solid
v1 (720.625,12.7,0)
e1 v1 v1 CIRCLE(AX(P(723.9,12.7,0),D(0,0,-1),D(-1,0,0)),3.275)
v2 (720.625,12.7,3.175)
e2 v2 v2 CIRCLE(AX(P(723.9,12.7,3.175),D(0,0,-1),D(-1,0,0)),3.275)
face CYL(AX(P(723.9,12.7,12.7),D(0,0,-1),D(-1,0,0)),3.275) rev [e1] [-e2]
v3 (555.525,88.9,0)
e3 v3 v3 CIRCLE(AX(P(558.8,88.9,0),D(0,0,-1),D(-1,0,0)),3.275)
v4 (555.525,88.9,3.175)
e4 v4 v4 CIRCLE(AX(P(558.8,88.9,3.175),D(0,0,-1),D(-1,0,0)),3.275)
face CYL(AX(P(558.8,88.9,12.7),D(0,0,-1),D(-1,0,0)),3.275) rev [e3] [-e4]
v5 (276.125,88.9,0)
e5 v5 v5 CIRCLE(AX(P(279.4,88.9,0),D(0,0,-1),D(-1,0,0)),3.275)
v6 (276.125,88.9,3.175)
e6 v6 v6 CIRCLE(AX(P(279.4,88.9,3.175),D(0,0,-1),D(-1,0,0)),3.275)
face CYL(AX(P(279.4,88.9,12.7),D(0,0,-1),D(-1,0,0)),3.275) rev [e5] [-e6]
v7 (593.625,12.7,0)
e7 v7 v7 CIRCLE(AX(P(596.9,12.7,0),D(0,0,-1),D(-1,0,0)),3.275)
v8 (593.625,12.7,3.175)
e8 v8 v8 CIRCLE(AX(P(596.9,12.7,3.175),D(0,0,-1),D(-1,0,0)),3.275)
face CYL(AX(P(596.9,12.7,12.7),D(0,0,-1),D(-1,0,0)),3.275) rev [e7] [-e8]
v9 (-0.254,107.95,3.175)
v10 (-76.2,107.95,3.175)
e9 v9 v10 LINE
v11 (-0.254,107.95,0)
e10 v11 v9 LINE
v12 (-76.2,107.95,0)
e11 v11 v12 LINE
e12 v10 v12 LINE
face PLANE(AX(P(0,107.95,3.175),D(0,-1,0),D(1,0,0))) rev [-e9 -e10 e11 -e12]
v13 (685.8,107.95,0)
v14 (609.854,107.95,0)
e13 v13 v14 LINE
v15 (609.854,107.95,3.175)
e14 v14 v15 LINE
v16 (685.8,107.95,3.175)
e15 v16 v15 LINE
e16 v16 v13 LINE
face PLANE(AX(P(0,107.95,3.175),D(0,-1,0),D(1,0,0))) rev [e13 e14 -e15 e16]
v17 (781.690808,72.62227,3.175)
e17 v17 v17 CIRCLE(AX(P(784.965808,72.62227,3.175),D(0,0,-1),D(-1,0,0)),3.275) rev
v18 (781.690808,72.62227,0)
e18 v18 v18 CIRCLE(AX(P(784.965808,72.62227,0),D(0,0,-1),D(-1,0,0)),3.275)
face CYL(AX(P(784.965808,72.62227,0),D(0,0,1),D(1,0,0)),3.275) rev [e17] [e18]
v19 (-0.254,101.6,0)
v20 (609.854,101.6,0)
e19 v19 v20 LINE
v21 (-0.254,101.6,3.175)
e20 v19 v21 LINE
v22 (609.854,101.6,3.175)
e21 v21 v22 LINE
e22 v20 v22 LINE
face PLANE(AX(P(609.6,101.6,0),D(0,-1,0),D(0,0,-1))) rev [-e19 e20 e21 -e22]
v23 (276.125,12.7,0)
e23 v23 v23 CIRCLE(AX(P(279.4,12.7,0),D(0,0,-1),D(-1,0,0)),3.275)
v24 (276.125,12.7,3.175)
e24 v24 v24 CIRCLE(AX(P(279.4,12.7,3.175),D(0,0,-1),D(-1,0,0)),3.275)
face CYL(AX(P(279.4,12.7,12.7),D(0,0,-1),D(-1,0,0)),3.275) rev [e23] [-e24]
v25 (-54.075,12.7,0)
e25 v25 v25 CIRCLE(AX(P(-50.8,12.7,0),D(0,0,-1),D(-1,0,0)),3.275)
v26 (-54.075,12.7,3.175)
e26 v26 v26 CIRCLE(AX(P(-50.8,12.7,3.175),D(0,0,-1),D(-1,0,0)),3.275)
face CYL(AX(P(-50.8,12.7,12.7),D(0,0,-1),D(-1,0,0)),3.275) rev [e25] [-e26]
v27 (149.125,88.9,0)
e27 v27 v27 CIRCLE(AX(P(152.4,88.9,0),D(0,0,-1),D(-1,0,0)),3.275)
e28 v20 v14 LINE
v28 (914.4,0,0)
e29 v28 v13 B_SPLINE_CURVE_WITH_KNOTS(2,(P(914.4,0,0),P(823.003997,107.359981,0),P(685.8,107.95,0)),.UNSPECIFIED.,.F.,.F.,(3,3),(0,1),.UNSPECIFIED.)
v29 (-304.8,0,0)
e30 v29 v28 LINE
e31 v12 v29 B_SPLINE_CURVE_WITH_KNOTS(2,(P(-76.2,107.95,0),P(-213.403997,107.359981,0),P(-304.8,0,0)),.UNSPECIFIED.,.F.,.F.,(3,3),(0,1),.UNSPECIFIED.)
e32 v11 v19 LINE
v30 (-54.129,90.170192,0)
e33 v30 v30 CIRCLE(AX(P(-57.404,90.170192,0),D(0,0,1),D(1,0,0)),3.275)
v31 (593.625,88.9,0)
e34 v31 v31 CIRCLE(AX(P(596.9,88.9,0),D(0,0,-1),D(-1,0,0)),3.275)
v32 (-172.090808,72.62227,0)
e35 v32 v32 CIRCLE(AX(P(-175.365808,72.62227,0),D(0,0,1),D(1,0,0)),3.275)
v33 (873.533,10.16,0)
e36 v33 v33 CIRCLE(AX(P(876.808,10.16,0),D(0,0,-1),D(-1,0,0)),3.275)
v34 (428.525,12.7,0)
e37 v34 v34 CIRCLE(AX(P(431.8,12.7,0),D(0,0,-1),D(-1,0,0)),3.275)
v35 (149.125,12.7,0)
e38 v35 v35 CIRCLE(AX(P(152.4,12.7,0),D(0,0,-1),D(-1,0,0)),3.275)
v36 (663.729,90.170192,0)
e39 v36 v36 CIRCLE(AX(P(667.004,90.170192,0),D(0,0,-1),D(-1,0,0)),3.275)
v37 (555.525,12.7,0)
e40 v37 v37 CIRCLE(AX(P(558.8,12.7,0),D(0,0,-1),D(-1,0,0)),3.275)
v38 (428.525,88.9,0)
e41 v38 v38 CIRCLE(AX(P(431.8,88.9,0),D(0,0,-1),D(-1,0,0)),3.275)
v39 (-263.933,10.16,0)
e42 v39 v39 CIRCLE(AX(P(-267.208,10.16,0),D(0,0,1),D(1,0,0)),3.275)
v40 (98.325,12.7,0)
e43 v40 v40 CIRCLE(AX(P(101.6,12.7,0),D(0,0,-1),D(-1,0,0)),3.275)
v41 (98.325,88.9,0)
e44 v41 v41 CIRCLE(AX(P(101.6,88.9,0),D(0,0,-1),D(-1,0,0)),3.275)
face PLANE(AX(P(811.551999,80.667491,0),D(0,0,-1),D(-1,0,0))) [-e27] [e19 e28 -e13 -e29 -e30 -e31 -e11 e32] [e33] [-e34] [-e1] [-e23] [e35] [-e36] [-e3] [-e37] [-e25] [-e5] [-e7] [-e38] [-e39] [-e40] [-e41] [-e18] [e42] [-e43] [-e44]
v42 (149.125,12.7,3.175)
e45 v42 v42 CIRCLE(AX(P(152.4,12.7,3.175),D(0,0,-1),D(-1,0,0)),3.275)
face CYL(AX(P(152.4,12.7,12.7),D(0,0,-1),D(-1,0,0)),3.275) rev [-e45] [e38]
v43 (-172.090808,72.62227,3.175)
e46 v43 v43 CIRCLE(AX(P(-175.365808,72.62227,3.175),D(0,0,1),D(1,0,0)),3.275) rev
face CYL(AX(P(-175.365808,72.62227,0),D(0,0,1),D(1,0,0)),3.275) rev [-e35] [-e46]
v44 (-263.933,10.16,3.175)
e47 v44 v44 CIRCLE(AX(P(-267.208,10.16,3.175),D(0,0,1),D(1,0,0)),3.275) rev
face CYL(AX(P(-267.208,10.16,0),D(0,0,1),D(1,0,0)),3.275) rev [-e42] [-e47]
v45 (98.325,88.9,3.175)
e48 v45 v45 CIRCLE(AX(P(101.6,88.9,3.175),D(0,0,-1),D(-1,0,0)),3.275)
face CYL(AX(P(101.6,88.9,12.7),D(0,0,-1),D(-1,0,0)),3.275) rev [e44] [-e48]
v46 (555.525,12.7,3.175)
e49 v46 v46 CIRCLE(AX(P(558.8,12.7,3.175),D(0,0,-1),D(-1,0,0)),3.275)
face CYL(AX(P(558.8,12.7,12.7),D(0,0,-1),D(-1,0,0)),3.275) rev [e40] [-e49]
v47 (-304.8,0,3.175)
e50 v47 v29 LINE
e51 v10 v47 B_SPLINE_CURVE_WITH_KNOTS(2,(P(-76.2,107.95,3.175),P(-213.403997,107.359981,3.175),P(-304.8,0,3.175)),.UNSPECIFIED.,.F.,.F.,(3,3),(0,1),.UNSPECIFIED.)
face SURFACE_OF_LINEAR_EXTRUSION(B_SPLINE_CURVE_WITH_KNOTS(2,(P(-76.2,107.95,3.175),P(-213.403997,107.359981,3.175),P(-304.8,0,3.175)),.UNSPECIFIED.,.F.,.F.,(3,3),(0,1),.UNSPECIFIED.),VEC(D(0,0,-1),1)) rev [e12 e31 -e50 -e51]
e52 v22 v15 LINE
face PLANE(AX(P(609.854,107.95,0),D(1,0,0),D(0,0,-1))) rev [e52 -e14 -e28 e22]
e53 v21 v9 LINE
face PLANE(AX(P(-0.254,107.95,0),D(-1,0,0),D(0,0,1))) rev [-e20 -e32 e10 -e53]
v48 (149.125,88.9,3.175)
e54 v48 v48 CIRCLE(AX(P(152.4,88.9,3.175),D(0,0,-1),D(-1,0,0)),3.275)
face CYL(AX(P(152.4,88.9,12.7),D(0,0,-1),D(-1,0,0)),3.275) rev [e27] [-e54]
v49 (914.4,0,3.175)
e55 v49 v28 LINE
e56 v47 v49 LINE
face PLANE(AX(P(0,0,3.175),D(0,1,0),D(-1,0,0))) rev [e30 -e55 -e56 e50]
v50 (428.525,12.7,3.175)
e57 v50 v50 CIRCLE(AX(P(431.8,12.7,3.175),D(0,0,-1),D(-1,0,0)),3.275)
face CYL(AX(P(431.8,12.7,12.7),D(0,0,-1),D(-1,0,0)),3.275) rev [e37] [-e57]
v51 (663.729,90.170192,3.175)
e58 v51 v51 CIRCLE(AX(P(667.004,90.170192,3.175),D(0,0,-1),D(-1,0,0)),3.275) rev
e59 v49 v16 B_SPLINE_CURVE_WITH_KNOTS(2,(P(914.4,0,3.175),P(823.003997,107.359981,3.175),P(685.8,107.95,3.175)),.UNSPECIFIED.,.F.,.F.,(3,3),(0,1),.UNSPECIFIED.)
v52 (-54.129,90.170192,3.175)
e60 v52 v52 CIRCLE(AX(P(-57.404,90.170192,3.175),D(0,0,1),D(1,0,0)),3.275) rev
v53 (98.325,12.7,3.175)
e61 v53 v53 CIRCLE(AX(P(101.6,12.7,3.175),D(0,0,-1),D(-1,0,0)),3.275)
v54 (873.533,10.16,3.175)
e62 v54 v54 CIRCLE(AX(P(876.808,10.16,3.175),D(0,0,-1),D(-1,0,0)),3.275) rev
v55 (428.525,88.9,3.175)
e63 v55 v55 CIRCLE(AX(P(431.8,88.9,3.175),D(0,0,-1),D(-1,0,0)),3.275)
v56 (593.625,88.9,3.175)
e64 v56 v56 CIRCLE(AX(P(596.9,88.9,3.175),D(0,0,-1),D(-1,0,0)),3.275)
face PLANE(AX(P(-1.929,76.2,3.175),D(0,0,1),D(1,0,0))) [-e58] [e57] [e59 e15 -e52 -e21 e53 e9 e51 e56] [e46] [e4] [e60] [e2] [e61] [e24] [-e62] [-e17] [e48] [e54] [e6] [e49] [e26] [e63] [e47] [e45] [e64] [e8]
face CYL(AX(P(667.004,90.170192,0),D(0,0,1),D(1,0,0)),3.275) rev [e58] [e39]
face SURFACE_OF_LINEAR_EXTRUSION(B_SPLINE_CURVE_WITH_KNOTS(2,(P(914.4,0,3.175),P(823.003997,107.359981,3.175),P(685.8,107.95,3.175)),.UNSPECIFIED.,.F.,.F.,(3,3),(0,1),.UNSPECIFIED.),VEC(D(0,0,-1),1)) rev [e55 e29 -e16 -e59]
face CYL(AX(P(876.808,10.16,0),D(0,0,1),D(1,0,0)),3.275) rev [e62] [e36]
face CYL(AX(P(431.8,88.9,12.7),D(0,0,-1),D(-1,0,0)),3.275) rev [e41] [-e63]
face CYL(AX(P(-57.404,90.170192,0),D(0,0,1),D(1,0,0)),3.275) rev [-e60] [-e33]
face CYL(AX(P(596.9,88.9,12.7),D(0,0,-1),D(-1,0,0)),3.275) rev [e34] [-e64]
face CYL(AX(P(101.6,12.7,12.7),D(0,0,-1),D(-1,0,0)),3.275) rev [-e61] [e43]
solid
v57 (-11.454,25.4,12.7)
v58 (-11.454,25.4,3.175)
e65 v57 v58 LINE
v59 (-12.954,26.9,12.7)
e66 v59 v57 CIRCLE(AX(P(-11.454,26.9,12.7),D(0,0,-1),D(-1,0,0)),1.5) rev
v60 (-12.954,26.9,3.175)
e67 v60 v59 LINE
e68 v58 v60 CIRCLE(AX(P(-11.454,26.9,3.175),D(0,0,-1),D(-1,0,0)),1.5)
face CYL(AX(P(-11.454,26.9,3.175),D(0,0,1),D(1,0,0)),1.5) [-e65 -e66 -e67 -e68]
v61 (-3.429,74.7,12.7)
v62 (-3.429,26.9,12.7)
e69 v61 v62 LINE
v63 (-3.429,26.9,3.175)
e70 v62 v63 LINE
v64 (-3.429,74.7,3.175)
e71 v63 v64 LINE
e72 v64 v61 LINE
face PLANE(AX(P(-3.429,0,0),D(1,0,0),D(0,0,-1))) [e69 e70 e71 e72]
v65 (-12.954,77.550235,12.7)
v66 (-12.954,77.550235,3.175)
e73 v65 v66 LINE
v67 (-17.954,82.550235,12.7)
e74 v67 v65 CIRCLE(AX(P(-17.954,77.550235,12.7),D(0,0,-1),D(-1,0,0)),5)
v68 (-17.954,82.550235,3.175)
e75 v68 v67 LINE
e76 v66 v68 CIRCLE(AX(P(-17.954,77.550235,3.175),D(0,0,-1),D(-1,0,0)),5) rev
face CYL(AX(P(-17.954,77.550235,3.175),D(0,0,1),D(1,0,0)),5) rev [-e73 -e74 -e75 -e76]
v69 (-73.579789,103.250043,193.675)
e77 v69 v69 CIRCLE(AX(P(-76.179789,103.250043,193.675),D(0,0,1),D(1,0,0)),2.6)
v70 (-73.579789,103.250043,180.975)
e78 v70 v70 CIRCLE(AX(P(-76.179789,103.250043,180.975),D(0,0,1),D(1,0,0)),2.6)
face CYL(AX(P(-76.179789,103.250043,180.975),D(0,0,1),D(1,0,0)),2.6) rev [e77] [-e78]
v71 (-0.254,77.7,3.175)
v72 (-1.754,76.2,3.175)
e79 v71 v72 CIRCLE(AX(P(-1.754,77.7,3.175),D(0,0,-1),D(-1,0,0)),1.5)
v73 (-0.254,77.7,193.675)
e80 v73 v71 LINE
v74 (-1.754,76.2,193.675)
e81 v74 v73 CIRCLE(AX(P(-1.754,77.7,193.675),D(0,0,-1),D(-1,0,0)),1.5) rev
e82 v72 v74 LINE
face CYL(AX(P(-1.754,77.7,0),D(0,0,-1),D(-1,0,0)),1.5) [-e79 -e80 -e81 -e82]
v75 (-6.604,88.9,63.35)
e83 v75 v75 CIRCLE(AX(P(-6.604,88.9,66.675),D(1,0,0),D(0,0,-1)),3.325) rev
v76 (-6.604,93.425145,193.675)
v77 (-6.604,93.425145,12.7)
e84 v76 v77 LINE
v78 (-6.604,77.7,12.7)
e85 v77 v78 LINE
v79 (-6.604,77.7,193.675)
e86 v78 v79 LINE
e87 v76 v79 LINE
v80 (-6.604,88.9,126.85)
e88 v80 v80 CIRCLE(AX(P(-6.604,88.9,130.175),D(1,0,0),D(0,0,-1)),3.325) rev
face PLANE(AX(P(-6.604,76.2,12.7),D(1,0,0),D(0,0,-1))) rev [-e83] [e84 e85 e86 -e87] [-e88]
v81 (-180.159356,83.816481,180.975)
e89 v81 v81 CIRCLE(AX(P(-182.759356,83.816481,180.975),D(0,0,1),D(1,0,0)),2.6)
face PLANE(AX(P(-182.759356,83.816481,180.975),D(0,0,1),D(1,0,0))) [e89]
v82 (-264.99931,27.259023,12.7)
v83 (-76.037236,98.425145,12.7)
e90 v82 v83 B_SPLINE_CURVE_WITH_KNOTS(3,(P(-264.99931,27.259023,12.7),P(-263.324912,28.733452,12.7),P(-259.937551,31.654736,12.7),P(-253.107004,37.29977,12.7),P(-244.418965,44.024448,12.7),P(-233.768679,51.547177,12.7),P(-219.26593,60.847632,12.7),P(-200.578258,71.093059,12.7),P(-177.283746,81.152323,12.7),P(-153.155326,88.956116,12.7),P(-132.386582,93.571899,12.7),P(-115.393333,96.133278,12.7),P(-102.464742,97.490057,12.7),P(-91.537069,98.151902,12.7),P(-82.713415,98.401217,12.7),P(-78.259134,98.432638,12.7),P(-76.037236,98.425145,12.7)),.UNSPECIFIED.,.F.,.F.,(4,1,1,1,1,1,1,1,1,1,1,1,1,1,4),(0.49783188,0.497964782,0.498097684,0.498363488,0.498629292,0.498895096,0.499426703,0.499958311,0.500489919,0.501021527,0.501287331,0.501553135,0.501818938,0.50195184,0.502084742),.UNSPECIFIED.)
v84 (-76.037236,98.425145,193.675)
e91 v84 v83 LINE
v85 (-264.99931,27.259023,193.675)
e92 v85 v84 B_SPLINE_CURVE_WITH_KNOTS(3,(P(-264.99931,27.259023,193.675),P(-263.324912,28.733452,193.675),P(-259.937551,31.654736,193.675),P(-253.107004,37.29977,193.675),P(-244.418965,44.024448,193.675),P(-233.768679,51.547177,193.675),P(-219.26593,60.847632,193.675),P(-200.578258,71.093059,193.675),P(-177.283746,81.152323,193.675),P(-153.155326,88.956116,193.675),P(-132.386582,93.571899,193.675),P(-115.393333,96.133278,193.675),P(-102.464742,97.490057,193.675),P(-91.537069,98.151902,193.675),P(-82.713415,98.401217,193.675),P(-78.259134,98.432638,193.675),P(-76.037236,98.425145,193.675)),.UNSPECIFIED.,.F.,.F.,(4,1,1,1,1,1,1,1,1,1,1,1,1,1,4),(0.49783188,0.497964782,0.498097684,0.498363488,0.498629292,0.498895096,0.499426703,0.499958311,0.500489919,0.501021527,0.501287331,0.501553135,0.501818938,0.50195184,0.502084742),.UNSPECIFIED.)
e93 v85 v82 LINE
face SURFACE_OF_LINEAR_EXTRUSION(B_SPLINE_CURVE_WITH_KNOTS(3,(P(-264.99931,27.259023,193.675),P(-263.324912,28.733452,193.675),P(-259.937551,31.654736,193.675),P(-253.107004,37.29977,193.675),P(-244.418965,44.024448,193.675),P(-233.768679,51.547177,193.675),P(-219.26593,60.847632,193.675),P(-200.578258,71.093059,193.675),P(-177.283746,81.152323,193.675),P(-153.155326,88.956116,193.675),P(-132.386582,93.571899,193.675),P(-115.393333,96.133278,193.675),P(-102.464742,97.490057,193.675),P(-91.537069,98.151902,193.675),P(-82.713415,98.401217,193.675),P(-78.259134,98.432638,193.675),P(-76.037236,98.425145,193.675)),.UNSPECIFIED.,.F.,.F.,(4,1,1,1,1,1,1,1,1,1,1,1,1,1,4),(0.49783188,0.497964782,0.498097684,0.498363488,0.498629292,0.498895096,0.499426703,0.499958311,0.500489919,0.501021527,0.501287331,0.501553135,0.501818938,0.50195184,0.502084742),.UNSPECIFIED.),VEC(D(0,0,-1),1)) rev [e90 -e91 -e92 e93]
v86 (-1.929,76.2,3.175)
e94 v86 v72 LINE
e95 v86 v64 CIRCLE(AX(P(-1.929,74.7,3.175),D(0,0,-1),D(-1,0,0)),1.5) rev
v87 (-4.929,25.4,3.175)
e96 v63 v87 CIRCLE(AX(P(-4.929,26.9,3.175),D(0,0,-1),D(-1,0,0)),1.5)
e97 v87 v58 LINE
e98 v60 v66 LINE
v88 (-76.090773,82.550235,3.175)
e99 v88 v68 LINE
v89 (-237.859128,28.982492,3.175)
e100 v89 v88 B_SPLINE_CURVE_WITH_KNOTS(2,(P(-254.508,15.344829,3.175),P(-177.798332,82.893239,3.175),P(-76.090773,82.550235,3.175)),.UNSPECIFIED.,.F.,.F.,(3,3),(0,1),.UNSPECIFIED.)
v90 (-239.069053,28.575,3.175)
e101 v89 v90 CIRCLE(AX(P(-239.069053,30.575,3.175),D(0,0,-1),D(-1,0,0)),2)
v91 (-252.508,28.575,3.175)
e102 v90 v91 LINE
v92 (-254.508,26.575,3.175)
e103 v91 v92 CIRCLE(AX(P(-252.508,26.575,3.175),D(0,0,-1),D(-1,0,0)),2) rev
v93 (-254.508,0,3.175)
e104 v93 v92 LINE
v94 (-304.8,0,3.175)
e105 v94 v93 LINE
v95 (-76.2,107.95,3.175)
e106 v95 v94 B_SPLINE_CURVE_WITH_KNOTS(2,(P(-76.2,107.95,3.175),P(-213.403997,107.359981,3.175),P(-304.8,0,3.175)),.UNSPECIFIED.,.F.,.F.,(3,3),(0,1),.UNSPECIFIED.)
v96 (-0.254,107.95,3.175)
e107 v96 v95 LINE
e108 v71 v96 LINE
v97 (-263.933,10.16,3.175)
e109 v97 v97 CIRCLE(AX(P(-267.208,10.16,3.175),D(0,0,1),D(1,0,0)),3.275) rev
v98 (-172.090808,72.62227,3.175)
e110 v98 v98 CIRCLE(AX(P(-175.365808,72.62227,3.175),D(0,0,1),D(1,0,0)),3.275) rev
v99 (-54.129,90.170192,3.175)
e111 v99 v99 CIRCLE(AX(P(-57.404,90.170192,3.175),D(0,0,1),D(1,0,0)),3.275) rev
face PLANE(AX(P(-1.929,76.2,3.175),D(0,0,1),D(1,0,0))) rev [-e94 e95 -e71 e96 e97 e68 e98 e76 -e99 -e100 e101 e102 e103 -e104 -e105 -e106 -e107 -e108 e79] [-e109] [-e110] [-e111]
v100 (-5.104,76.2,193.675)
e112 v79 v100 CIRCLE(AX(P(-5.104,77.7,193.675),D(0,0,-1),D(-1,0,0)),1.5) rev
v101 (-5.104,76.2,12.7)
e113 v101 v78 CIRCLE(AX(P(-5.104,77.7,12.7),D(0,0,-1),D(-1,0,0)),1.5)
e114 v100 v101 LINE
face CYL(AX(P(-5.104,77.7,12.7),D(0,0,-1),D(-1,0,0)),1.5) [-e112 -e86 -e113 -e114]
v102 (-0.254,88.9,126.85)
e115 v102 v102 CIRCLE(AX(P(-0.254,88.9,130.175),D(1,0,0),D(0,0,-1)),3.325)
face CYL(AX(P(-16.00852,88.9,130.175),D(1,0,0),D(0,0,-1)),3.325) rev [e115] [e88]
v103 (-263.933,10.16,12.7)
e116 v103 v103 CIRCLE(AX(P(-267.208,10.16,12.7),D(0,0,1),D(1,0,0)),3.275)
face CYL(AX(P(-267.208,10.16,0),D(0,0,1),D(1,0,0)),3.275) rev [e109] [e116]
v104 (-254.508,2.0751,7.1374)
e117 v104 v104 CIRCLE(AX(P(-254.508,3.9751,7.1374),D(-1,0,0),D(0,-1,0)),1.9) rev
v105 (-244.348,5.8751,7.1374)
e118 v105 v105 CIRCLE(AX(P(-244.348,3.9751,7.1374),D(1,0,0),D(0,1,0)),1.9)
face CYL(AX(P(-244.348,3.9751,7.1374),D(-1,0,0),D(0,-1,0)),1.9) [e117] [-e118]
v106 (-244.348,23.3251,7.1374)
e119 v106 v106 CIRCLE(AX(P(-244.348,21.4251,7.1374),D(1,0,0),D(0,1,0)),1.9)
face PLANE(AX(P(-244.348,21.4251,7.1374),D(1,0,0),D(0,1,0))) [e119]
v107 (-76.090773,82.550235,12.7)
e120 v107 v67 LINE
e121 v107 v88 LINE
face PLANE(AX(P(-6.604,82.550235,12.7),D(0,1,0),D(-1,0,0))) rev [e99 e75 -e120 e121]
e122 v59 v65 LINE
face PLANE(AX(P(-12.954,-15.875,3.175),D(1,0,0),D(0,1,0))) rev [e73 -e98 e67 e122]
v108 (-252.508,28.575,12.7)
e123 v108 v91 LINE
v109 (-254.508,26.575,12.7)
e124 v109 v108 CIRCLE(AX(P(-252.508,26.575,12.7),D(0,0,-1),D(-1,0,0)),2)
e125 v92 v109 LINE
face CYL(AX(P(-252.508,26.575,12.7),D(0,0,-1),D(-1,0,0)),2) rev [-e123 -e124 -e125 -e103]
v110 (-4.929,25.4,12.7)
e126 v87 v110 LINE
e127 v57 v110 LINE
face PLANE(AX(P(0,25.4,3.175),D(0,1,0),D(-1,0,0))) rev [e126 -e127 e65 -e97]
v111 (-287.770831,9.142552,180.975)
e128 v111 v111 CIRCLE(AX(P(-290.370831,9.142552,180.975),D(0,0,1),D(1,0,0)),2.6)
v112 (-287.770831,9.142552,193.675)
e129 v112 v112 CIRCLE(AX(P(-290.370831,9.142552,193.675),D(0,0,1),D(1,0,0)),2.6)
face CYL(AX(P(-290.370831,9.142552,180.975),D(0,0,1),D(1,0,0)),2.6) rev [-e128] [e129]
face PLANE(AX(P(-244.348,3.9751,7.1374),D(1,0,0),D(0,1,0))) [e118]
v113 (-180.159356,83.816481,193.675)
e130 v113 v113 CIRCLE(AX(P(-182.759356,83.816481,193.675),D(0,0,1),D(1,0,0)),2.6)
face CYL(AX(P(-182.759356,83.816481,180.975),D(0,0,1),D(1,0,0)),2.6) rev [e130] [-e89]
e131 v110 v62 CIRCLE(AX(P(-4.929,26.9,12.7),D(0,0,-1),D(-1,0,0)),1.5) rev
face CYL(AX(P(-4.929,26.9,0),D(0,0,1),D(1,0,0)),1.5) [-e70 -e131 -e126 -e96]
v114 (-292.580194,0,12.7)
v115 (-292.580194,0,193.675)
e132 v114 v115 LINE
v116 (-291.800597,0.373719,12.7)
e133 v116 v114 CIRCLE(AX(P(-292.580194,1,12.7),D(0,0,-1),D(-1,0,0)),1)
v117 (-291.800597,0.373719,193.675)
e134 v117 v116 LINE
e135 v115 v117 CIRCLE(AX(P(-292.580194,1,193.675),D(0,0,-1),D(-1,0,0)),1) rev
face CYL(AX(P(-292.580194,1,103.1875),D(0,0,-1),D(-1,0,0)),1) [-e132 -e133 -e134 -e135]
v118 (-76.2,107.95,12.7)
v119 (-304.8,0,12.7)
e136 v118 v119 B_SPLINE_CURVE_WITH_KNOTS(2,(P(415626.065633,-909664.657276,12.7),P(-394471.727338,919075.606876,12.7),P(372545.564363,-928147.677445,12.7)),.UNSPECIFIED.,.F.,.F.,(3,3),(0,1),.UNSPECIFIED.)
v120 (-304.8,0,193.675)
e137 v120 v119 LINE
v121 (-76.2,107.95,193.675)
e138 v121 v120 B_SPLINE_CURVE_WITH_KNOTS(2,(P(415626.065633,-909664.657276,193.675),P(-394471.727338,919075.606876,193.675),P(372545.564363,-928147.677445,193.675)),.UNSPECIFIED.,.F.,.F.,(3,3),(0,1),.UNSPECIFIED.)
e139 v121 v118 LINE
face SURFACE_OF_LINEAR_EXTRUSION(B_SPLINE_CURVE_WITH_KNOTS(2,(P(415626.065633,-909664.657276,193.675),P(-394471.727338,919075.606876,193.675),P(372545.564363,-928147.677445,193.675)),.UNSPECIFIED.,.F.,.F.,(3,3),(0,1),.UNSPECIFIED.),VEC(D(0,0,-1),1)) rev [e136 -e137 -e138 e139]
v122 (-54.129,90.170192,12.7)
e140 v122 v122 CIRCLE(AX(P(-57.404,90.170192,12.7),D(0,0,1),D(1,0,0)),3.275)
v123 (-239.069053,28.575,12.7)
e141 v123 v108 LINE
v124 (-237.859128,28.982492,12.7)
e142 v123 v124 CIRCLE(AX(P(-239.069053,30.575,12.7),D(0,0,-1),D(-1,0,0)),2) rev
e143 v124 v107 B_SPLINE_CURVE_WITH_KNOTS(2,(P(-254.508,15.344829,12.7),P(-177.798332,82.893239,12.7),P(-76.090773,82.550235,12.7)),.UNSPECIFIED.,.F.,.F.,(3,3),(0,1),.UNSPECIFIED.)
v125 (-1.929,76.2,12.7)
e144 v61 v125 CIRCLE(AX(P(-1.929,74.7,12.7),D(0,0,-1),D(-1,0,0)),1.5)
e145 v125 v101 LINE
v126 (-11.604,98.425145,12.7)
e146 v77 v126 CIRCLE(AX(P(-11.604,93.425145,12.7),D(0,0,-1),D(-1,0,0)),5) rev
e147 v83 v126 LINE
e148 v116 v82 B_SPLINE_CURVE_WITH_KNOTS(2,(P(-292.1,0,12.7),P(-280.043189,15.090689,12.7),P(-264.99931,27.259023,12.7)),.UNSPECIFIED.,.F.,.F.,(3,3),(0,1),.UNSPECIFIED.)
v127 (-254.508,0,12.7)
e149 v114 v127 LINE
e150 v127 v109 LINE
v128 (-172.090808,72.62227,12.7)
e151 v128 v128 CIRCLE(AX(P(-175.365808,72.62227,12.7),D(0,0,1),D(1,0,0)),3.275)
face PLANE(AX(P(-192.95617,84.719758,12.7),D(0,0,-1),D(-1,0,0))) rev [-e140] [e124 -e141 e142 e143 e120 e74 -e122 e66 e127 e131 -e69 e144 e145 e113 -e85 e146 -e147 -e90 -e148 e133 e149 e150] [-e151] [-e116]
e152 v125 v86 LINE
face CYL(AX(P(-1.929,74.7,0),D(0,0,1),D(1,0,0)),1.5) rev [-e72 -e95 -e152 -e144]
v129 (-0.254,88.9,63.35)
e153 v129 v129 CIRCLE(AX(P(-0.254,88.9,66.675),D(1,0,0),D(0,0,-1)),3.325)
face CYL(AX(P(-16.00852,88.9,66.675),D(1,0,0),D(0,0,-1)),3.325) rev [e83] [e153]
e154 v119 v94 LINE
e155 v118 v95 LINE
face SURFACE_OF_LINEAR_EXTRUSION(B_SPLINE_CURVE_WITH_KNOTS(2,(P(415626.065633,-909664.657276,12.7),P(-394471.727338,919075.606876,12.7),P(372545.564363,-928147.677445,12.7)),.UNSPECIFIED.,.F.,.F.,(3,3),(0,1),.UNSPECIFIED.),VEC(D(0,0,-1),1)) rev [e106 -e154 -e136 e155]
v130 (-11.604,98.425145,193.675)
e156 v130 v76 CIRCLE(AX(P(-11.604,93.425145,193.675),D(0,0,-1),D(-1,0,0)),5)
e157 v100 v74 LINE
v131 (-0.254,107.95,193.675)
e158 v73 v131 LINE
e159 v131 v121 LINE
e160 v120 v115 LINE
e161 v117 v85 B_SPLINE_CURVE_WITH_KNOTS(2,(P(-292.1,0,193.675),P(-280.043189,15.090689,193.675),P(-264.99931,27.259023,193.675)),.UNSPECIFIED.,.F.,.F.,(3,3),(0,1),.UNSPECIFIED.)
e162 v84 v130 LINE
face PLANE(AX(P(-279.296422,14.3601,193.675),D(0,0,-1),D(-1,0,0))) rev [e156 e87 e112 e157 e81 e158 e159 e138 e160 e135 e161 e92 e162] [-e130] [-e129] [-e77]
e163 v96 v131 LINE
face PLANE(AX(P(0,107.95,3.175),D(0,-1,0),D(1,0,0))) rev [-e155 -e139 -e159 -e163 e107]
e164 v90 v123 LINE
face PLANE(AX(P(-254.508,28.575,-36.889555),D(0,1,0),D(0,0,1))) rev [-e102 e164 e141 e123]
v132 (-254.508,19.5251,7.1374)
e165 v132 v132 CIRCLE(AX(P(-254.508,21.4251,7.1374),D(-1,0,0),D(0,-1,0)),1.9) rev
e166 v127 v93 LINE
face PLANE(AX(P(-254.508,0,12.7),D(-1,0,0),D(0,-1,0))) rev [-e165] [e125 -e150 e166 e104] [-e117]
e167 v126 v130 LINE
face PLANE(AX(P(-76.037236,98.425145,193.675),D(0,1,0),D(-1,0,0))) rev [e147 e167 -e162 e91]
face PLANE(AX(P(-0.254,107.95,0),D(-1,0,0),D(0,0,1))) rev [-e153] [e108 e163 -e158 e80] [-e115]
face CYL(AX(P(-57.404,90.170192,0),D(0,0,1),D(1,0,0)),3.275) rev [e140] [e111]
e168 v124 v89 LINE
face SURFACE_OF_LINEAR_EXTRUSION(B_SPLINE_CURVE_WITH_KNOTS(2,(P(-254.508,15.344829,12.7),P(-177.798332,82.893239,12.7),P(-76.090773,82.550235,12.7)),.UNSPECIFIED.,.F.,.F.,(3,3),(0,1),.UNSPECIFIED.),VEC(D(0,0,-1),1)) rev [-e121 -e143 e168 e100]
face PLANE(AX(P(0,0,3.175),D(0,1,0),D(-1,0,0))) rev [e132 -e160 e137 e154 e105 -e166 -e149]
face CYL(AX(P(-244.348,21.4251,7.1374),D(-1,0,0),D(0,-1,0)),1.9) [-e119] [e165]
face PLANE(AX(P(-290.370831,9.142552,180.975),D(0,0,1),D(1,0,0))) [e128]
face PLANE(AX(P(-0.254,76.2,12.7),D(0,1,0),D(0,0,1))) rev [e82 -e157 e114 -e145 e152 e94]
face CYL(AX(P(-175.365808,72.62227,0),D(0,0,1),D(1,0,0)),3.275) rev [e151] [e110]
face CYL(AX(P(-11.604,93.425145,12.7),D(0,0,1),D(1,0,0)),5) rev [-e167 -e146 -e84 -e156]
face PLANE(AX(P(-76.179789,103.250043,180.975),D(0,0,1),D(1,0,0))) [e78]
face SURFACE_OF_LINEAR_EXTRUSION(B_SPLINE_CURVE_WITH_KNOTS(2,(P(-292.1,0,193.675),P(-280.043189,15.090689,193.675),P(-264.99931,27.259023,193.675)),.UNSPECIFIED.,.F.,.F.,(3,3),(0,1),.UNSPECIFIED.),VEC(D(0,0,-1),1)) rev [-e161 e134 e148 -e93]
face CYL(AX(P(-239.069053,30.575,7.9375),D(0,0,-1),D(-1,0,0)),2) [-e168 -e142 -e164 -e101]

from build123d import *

# Parameters (mm, degrees)
BOSS_EXTRUDE1_DEPTH = 3.175
CUT_EXTRUDE1_DEPTH  = 921.755474233
BOSS_EXTRUDE2_DEPTH = 9.525
BOSS_EXTRUDE3_DEPTH = 180.975
SKETCH6_W           = 28.082698006
SKETCH6_H           = 28.575
CUT_EXTRUDE2_DEPTH  = 9.525
SKETCH7_R           = 3.275
CUT_EXTRUDE3_DEPTH  = 939.366939617
SKETCH8_R           = 3.325
CUT_EXTRUDE5_DEPTH  = 6.35
SKETCH9_R           = 2.6
SKETCH9_R_2         = 2.600000001
CUT_EXTRUDE6_DEPTH  = 12.7
SKETCH11_R          = 1.9
BOSS_EXTRUDE5_DEPTH = 10.16
SKETCH14_W          = 12.7
SKETCH14_H          = 9.525
BOSS_EXTRUDE8_DEPTH = 57.150234853
SKETCH17_W          = 9.525
SKETCH17_H          = 50.8
CUT_EXTRUDE9_DEPTH  = 3.175
FILLET1_R           = 5
FILLET2_R           = 2
FILLET3_R           = 1
FILLET8_R           = 5
FILLET9_R           = 1.5
FILLET10_R          = 1.5
SKETCH18_R          = 3.275
CUT_EXTRUDE10_DEPTH = 12.7


# Read off the part's stored shape, not the designer's step: Split1
with BuildPart() as part:
    # Sketch1 → Boss-Extrude1 (new body)
    with BuildSketch(Plane.XY):
        with BuildLine():
            Line((0, 0), (-304.8, 0))
            add(Edge.make_bspline(
                [(-304.8, 0), (-213.403997347, 107.359981337), (-76.2, 107.95)],
                knots=[0, 0, 0, 1, 1, 1], degree=2))
            Line((-76.2, 107.95), (0, 107.95))
            Line((0, 107.95), (609.6, 107.95))
            Line((609.6, 107.95), (685.8, 107.95))
            add(Edge.make_bspline(
                [(914.4, 0), (823.003997347, 107.359981337), (685.8, 107.95)],
                knots=[0, 0, 0, 1, 1, 1], degree=2))
            Line((914.4, 0), (609.6, 0))
            Line((609.6, 0), (0, 0))
        make_face()
    extrude(amount=BOSS_EXTRUDE1_DEPTH)

    # Sketch2 → Cut-Extrude1 (cut, through all)
    with BuildSketch(Plane.XY.offset(3.175)):
        Polygon((0, 107.95), (609.6, 107.95), (609.854, 107.95), (609.854, 101.6), (609.6, 101.6), (0, 101.6), (-0.254, 101.6), (-0.254, 107.95), align=None)
    extrude(amount=-CUT_EXTRUDE1_DEPTH, mode=Mode.SUBTRACT)

    # Sketch3 → Boss-Extrude2 (add)
    with BuildSketch(Plane.XY.offset(3.175)):
        with BuildLine():
            Line((-304.8, 0), (-254.508, 0))
            Line((-254.508, 0), (-254.508, 15.344828713))
            add(Edge.make_bspline(
                [(-254.508, 15.344828713), (-177.798332328, 82.893238953), (-76.090773332, 82.550234853)],
                knots=[0, 0, 0, 1, 1, 1], degree=2))
            Line((-76.090773332, 82.550234853), (-6.604, 82.550234853))
            Line((-6.604, 82.550234853), (-6.604, 76.2))
            Line((-6.604, 76.2), (-0.254, 76.2))
            Line((-0.254, 76.2), (-0.254, 107.95))
            Line((-0.254, 107.95), (-76.2, 107.95))
            add(Edge.make_bspline(
                [(-76.2, 107.95), (-213.403997347, 107.359981337), (-304.8, 0)],
                knots=[0, 0, 0, 1, 1, 1], degree=2))
        make_face()
    extrude(amount=BOSS_EXTRUDE2_DEPTH)

    # Sketch5 → Boss-Extrude3 (add)
    with BuildSketch(Plane.XY.offset(12.7)):
        with BuildLine():
            Line((-304.8, 0), (-292.1, 0))
            add(Edge.make_bspline(
                [(-264.999310143, 27.259023461), (-280.043189094, 15.090688978), (-292.1, 0)],
                knots=[0, 0, 0, 1, 1, 1], degree=2))
            add(Edge.make_bspline(
                [(-264.999310143, 27.259023461), (-263.324912471, 28.733451708), (-259.93755133, 31.654735884), (-253.107003874, 37.29977015), (-244.418964995, 44.024448353), (-233.76867915, 51.547177424), (-219.265929961, 60.847632169), (-200.578257731, 71.093058658), (-177.28374589, 81.152323376), (-153.155325898, 88.956116173), (-132.386582303, 93.571898544), (-115.39333326, 96.133277835), (-102.464741628, 97.490056952), (-91.537068573, 98.151901873), (-82.713415498, 98.401217113), (-78.259134389, 98.432637828), (-76.037235922, 98.425144577)],
                knots=[0.49783188, 0.49783188, 0.49783188, 0.49783188, 0.497964782, 0.498097684, 0.498363488, 0.498629292, 0.498895096, 0.499426703, 0.499958311, 0.500489919, 0.501021527, 0.501287331, 0.501553135, 0.501818938, 0.50195184, 0.502084742, 0.502084742, 0.502084742, 0.502084742], degree=3))
            Line((-76.037235922, 98.425144577), (-6.604, 98.425144577))
            Line((-6.604, 98.425144577), (-6.604, 82.550234853))
            Line((-6.604, 82.550234853), (-6.604, 76.2))
            Line((-6.604, 76.2), (-0.254, 76.2))
            Line((-0.254, 76.2), (-0.254, 107.95))
            Line((-0.254, 107.95), (-76.199999999, 107.95))
            add(Edge.make_bspline(
                [(-76.199999999, 107.95), (-213.403997347, 107.359981337), (-304.8, 0)],
                knots=[0, 0, 0, 1, 1, 1], degree=2))
        make_face()
    extrude(amount=BOSS_EXTRUDE3_DEPTH)

    # Sketch6 → Cut-Extrude2 (cut)
    with BuildSketch(Plane.XY.offset(12.7)):
        with Locations((-240.466650997, 14.2875)):
            Rectangle(SKETCH6_W, SKETCH6_H)
    extrude(amount=-CUT_EXTRUDE2_DEPTH, mode=Mode.SUBTRACT)

    # Sketch7 → Cut-Extrude3 (cut, through all)
    with BuildSketch(Plane.XY.offset(12.7)):
        with Locations((-267.208, 10.16)):
            Circle(SKETCH7_R)
        with Locations((-175.365808452, 72.622269579)):
            Circle(SKETCH7_R)
        with Locations((-57.404, 90.17019152)):
            Circle(SKETCH7_R)
    cut_extrude3 = extrude(amount=-CUT_EXTRUDE3_DEPTH, mode=Mode.SUBTRACT)

    # Sketch8 → Cut-Extrude5 (cut)
    with BuildSketch(Plane(origin=(-0.254, 0, 0), x_dir=(0, 0, -1), z_dir=(1, 0, 0))):
        with Locations((-66.675, 88.9)):
            Circle(SKETCH8_R)
        with Locations((-130.175, 88.9)):
            Circle(SKETCH8_R)
    extrude(amount=-CUT_EXTRUDE5_DEPTH, mode=Mode.SUBTRACT)

    # Sketch9 → Cut-Extrude6 (cut)
    with BuildSketch(Plane.XY.offset(193.675)):
        with Locations((-290.370830702, 9.142552388)):
            Circle(SKETCH9_R)
        with Locations((-182.759356376, 83.816480509)):
            Circle(SKETCH9_R)
        with Locations((-76.179788765, 103.250043457)):
            Circle(SKETCH9_R_2)
    extrude(amount=-CUT_EXTRUDE6_DEPTH, mode=Mode.SUBTRACT)

    # Sketch11 → Boss-Extrude5 (add)
    with BuildSketch(Plane(origin=(-254.508, 2e-09, 0), x_dir=(0, 0, -1), z_dir=(1.0, -6.037741648177811e-12, 0))):
        with Locations(Location((-7.1374, 3.975099998, 0), (0, 0, 270))):
            Circle(SKETCH11_R)
        with Locations(Location((-7.1374, 21.425099998, 0), (0, 0, 270))):
            Circle(SKETCH11_R)
    extrude(amount=BOSS_EXTRUDE5_DEPTH)

    # Sketch14 → Boss-Extrude8 (add)
    with BuildSketch(Plane.XZ.offset(-82.550234853)):
        with Locations((-6.604, 7.9375)):
            Rectangle(SKETCH14_W, SKETCH14_H)
    extrude(amount=BOSS_EXTRUDE8_DEPTH)

    # Sketch17 → Cut-Extrude9 (cut)
    with BuildSketch(Plane(origin=(-0.254, 0, 0), x_dir=(0, 0, -1), z_dir=(1, 0, 0))):
        with Locations((-7.9375, 50.8)):
            Rectangle(SKETCH17_W, SKETCH17_H)
    extrude(amount=-CUT_EXTRUDE9_DEPTH, mode=Mode.SUBTRACT)

    # Fillet1
    fillet1_edges = [part.edges().sort_by_distance(p)[0] for p in [
        (-6.604, 98.425144577, 103.1875),
    ]]
    fillet(fillet1_edges, radius=FILLET1_R)

    # Fillet2
    fillet2_edges = [part.edges().sort_by_distance(p)[0] for p in [
        (-238.394170448, 28.575, 7.9375),
        (-254.508, 28.575, 7.9375),
    ]]
    fillet(fillet2_edges, radius=FILLET2_R)

    # Fillet3
    # the kernel refuses this fillet: 1 mm, written as the material it takes off along each edge
    with BuildSketch(Plane(origin=(-292.1, 0, 12.7), x_dir=(0.6252400597778598, 0.7804324875663354, 0), z_dir=(0, 0, 1))) as fillet3_piece_1:
        with BuildLine():
            CenterArc((0.480195921, 0.999999109), FILLET3_R, 218.699809372, 51.223710378)
            Line((-0.300236566, 0.374759049), (-0.315845216, 0.362254248))
            Line((-0.315845216, 0.362254248), (-0.01560865, -0.012504801))
            Line((-0.01560865, -0.012504801), (2.669e-05, -0.019999982))
            ThreePointArc((2.669e-05, -0.019999982), (0.239430546, -0.019840221), (0.478834393, -0.019999982))
            Line((0.478834393, -0.019999982), (0.478861089, 0))
        make_face()
    extrude(amount=180.975, mode=Mode.SUBTRACT)

    # Fillet8
    fillet8_edges = [part.edges().sort_by_distance(p)[0] for p in [
        (-12.954, 82.550234853, 7.9375),
    ]]
    fillet(fillet8_edges, radius=FILLET8_R)

    # Fillet9
    fillet9_edges = [part.edges().sort_by_distance(p)[0] for p in [
        (-12.954, 25.4, 7.9375),
        (-3.429, 25.4, 7.9375),
        (-6.604, 76.2, 103.1875),
        (-0.254, 76.2, 98.425),
    ]]
    fillet(fillet9_edges, radius=FILLET9_R)

    # Fillet10
    fillet10_edges = [part.edges().sort_by_distance(p)[0] for p in [
        (-3.429, 76.2, 7.9375),
    ]]
    fillet(fillet10_edges, radius=FILLET10_R)

    # Sketch18 → Cut-Extrude10 (cut)
    with BuildSketch(Plane(origin=(0, 0, 0), x_dir=(-1, 0, 0), z_dir=(0, 0, -1))):
        with Locations((50.8, 12.7)):
            Circle(SKETCH18_R)
        with Locations((-101.6, 12.7)):
            Circle(SKETCH18_R)
        with Locations((-101.6, 88.9)):
            Circle(SKETCH18_R)
        with Locations((-558.8, 88.9)):
            Circle(SKETCH18_R)
        with Locations((-152.4, 88.9)):
            Circle(SKETCH18_R)
        with Locations((-596.9, 88.9)):
            Circle(SKETCH18_R)
        with Locations((-596.9, 12.7)):
            Circle(SKETCH18_R)
        with Locations((-558.8, 12.7)):
            Circle(SKETCH18_R)
        with Locations((-152.4, 12.7)):
            Circle(SKETCH18_R)
        with Locations((-723.9, 12.7)):
            Circle(SKETCH18_R)
        with Locations((-431.8, 88.9)):
            Circle(SKETCH18_R)
        with Locations((-431.8, 12.7)):
            Circle(SKETCH18_R)
        with Locations((-279.4, 12.7)):
            Circle(SKETCH18_R)
        with Locations((-279.4, 88.9)):
            Circle(SKETCH18_R)
    extrude(amount=-CUT_EXTRUDE10_DEPTH, mode=Mode.SUBTRACT)

    # Mirror1: Cut-Extrude3 across plane
    add(cut_extrude3.mirror(Plane(origin=(304.8, 0, 0), x_dir=(0, 0, 1), z_dir=(1, 0, 0))), mode=Mode.SUBTRACT)


with BuildPart() as body_2:
    # Split1: the piece on the far side of the plane
    add(part.part)
    split(bisect_by=Plane.XY.offset(3.175), keep=Keep.BOTTOM)


with BuildPart() as part_1:
    add(part.part)

    # Split1
    split(bisect_by=Plane.XY.offset(3.175), keep=Keep.TOP)


solid = Compound([body_2.part, part_1.part])
